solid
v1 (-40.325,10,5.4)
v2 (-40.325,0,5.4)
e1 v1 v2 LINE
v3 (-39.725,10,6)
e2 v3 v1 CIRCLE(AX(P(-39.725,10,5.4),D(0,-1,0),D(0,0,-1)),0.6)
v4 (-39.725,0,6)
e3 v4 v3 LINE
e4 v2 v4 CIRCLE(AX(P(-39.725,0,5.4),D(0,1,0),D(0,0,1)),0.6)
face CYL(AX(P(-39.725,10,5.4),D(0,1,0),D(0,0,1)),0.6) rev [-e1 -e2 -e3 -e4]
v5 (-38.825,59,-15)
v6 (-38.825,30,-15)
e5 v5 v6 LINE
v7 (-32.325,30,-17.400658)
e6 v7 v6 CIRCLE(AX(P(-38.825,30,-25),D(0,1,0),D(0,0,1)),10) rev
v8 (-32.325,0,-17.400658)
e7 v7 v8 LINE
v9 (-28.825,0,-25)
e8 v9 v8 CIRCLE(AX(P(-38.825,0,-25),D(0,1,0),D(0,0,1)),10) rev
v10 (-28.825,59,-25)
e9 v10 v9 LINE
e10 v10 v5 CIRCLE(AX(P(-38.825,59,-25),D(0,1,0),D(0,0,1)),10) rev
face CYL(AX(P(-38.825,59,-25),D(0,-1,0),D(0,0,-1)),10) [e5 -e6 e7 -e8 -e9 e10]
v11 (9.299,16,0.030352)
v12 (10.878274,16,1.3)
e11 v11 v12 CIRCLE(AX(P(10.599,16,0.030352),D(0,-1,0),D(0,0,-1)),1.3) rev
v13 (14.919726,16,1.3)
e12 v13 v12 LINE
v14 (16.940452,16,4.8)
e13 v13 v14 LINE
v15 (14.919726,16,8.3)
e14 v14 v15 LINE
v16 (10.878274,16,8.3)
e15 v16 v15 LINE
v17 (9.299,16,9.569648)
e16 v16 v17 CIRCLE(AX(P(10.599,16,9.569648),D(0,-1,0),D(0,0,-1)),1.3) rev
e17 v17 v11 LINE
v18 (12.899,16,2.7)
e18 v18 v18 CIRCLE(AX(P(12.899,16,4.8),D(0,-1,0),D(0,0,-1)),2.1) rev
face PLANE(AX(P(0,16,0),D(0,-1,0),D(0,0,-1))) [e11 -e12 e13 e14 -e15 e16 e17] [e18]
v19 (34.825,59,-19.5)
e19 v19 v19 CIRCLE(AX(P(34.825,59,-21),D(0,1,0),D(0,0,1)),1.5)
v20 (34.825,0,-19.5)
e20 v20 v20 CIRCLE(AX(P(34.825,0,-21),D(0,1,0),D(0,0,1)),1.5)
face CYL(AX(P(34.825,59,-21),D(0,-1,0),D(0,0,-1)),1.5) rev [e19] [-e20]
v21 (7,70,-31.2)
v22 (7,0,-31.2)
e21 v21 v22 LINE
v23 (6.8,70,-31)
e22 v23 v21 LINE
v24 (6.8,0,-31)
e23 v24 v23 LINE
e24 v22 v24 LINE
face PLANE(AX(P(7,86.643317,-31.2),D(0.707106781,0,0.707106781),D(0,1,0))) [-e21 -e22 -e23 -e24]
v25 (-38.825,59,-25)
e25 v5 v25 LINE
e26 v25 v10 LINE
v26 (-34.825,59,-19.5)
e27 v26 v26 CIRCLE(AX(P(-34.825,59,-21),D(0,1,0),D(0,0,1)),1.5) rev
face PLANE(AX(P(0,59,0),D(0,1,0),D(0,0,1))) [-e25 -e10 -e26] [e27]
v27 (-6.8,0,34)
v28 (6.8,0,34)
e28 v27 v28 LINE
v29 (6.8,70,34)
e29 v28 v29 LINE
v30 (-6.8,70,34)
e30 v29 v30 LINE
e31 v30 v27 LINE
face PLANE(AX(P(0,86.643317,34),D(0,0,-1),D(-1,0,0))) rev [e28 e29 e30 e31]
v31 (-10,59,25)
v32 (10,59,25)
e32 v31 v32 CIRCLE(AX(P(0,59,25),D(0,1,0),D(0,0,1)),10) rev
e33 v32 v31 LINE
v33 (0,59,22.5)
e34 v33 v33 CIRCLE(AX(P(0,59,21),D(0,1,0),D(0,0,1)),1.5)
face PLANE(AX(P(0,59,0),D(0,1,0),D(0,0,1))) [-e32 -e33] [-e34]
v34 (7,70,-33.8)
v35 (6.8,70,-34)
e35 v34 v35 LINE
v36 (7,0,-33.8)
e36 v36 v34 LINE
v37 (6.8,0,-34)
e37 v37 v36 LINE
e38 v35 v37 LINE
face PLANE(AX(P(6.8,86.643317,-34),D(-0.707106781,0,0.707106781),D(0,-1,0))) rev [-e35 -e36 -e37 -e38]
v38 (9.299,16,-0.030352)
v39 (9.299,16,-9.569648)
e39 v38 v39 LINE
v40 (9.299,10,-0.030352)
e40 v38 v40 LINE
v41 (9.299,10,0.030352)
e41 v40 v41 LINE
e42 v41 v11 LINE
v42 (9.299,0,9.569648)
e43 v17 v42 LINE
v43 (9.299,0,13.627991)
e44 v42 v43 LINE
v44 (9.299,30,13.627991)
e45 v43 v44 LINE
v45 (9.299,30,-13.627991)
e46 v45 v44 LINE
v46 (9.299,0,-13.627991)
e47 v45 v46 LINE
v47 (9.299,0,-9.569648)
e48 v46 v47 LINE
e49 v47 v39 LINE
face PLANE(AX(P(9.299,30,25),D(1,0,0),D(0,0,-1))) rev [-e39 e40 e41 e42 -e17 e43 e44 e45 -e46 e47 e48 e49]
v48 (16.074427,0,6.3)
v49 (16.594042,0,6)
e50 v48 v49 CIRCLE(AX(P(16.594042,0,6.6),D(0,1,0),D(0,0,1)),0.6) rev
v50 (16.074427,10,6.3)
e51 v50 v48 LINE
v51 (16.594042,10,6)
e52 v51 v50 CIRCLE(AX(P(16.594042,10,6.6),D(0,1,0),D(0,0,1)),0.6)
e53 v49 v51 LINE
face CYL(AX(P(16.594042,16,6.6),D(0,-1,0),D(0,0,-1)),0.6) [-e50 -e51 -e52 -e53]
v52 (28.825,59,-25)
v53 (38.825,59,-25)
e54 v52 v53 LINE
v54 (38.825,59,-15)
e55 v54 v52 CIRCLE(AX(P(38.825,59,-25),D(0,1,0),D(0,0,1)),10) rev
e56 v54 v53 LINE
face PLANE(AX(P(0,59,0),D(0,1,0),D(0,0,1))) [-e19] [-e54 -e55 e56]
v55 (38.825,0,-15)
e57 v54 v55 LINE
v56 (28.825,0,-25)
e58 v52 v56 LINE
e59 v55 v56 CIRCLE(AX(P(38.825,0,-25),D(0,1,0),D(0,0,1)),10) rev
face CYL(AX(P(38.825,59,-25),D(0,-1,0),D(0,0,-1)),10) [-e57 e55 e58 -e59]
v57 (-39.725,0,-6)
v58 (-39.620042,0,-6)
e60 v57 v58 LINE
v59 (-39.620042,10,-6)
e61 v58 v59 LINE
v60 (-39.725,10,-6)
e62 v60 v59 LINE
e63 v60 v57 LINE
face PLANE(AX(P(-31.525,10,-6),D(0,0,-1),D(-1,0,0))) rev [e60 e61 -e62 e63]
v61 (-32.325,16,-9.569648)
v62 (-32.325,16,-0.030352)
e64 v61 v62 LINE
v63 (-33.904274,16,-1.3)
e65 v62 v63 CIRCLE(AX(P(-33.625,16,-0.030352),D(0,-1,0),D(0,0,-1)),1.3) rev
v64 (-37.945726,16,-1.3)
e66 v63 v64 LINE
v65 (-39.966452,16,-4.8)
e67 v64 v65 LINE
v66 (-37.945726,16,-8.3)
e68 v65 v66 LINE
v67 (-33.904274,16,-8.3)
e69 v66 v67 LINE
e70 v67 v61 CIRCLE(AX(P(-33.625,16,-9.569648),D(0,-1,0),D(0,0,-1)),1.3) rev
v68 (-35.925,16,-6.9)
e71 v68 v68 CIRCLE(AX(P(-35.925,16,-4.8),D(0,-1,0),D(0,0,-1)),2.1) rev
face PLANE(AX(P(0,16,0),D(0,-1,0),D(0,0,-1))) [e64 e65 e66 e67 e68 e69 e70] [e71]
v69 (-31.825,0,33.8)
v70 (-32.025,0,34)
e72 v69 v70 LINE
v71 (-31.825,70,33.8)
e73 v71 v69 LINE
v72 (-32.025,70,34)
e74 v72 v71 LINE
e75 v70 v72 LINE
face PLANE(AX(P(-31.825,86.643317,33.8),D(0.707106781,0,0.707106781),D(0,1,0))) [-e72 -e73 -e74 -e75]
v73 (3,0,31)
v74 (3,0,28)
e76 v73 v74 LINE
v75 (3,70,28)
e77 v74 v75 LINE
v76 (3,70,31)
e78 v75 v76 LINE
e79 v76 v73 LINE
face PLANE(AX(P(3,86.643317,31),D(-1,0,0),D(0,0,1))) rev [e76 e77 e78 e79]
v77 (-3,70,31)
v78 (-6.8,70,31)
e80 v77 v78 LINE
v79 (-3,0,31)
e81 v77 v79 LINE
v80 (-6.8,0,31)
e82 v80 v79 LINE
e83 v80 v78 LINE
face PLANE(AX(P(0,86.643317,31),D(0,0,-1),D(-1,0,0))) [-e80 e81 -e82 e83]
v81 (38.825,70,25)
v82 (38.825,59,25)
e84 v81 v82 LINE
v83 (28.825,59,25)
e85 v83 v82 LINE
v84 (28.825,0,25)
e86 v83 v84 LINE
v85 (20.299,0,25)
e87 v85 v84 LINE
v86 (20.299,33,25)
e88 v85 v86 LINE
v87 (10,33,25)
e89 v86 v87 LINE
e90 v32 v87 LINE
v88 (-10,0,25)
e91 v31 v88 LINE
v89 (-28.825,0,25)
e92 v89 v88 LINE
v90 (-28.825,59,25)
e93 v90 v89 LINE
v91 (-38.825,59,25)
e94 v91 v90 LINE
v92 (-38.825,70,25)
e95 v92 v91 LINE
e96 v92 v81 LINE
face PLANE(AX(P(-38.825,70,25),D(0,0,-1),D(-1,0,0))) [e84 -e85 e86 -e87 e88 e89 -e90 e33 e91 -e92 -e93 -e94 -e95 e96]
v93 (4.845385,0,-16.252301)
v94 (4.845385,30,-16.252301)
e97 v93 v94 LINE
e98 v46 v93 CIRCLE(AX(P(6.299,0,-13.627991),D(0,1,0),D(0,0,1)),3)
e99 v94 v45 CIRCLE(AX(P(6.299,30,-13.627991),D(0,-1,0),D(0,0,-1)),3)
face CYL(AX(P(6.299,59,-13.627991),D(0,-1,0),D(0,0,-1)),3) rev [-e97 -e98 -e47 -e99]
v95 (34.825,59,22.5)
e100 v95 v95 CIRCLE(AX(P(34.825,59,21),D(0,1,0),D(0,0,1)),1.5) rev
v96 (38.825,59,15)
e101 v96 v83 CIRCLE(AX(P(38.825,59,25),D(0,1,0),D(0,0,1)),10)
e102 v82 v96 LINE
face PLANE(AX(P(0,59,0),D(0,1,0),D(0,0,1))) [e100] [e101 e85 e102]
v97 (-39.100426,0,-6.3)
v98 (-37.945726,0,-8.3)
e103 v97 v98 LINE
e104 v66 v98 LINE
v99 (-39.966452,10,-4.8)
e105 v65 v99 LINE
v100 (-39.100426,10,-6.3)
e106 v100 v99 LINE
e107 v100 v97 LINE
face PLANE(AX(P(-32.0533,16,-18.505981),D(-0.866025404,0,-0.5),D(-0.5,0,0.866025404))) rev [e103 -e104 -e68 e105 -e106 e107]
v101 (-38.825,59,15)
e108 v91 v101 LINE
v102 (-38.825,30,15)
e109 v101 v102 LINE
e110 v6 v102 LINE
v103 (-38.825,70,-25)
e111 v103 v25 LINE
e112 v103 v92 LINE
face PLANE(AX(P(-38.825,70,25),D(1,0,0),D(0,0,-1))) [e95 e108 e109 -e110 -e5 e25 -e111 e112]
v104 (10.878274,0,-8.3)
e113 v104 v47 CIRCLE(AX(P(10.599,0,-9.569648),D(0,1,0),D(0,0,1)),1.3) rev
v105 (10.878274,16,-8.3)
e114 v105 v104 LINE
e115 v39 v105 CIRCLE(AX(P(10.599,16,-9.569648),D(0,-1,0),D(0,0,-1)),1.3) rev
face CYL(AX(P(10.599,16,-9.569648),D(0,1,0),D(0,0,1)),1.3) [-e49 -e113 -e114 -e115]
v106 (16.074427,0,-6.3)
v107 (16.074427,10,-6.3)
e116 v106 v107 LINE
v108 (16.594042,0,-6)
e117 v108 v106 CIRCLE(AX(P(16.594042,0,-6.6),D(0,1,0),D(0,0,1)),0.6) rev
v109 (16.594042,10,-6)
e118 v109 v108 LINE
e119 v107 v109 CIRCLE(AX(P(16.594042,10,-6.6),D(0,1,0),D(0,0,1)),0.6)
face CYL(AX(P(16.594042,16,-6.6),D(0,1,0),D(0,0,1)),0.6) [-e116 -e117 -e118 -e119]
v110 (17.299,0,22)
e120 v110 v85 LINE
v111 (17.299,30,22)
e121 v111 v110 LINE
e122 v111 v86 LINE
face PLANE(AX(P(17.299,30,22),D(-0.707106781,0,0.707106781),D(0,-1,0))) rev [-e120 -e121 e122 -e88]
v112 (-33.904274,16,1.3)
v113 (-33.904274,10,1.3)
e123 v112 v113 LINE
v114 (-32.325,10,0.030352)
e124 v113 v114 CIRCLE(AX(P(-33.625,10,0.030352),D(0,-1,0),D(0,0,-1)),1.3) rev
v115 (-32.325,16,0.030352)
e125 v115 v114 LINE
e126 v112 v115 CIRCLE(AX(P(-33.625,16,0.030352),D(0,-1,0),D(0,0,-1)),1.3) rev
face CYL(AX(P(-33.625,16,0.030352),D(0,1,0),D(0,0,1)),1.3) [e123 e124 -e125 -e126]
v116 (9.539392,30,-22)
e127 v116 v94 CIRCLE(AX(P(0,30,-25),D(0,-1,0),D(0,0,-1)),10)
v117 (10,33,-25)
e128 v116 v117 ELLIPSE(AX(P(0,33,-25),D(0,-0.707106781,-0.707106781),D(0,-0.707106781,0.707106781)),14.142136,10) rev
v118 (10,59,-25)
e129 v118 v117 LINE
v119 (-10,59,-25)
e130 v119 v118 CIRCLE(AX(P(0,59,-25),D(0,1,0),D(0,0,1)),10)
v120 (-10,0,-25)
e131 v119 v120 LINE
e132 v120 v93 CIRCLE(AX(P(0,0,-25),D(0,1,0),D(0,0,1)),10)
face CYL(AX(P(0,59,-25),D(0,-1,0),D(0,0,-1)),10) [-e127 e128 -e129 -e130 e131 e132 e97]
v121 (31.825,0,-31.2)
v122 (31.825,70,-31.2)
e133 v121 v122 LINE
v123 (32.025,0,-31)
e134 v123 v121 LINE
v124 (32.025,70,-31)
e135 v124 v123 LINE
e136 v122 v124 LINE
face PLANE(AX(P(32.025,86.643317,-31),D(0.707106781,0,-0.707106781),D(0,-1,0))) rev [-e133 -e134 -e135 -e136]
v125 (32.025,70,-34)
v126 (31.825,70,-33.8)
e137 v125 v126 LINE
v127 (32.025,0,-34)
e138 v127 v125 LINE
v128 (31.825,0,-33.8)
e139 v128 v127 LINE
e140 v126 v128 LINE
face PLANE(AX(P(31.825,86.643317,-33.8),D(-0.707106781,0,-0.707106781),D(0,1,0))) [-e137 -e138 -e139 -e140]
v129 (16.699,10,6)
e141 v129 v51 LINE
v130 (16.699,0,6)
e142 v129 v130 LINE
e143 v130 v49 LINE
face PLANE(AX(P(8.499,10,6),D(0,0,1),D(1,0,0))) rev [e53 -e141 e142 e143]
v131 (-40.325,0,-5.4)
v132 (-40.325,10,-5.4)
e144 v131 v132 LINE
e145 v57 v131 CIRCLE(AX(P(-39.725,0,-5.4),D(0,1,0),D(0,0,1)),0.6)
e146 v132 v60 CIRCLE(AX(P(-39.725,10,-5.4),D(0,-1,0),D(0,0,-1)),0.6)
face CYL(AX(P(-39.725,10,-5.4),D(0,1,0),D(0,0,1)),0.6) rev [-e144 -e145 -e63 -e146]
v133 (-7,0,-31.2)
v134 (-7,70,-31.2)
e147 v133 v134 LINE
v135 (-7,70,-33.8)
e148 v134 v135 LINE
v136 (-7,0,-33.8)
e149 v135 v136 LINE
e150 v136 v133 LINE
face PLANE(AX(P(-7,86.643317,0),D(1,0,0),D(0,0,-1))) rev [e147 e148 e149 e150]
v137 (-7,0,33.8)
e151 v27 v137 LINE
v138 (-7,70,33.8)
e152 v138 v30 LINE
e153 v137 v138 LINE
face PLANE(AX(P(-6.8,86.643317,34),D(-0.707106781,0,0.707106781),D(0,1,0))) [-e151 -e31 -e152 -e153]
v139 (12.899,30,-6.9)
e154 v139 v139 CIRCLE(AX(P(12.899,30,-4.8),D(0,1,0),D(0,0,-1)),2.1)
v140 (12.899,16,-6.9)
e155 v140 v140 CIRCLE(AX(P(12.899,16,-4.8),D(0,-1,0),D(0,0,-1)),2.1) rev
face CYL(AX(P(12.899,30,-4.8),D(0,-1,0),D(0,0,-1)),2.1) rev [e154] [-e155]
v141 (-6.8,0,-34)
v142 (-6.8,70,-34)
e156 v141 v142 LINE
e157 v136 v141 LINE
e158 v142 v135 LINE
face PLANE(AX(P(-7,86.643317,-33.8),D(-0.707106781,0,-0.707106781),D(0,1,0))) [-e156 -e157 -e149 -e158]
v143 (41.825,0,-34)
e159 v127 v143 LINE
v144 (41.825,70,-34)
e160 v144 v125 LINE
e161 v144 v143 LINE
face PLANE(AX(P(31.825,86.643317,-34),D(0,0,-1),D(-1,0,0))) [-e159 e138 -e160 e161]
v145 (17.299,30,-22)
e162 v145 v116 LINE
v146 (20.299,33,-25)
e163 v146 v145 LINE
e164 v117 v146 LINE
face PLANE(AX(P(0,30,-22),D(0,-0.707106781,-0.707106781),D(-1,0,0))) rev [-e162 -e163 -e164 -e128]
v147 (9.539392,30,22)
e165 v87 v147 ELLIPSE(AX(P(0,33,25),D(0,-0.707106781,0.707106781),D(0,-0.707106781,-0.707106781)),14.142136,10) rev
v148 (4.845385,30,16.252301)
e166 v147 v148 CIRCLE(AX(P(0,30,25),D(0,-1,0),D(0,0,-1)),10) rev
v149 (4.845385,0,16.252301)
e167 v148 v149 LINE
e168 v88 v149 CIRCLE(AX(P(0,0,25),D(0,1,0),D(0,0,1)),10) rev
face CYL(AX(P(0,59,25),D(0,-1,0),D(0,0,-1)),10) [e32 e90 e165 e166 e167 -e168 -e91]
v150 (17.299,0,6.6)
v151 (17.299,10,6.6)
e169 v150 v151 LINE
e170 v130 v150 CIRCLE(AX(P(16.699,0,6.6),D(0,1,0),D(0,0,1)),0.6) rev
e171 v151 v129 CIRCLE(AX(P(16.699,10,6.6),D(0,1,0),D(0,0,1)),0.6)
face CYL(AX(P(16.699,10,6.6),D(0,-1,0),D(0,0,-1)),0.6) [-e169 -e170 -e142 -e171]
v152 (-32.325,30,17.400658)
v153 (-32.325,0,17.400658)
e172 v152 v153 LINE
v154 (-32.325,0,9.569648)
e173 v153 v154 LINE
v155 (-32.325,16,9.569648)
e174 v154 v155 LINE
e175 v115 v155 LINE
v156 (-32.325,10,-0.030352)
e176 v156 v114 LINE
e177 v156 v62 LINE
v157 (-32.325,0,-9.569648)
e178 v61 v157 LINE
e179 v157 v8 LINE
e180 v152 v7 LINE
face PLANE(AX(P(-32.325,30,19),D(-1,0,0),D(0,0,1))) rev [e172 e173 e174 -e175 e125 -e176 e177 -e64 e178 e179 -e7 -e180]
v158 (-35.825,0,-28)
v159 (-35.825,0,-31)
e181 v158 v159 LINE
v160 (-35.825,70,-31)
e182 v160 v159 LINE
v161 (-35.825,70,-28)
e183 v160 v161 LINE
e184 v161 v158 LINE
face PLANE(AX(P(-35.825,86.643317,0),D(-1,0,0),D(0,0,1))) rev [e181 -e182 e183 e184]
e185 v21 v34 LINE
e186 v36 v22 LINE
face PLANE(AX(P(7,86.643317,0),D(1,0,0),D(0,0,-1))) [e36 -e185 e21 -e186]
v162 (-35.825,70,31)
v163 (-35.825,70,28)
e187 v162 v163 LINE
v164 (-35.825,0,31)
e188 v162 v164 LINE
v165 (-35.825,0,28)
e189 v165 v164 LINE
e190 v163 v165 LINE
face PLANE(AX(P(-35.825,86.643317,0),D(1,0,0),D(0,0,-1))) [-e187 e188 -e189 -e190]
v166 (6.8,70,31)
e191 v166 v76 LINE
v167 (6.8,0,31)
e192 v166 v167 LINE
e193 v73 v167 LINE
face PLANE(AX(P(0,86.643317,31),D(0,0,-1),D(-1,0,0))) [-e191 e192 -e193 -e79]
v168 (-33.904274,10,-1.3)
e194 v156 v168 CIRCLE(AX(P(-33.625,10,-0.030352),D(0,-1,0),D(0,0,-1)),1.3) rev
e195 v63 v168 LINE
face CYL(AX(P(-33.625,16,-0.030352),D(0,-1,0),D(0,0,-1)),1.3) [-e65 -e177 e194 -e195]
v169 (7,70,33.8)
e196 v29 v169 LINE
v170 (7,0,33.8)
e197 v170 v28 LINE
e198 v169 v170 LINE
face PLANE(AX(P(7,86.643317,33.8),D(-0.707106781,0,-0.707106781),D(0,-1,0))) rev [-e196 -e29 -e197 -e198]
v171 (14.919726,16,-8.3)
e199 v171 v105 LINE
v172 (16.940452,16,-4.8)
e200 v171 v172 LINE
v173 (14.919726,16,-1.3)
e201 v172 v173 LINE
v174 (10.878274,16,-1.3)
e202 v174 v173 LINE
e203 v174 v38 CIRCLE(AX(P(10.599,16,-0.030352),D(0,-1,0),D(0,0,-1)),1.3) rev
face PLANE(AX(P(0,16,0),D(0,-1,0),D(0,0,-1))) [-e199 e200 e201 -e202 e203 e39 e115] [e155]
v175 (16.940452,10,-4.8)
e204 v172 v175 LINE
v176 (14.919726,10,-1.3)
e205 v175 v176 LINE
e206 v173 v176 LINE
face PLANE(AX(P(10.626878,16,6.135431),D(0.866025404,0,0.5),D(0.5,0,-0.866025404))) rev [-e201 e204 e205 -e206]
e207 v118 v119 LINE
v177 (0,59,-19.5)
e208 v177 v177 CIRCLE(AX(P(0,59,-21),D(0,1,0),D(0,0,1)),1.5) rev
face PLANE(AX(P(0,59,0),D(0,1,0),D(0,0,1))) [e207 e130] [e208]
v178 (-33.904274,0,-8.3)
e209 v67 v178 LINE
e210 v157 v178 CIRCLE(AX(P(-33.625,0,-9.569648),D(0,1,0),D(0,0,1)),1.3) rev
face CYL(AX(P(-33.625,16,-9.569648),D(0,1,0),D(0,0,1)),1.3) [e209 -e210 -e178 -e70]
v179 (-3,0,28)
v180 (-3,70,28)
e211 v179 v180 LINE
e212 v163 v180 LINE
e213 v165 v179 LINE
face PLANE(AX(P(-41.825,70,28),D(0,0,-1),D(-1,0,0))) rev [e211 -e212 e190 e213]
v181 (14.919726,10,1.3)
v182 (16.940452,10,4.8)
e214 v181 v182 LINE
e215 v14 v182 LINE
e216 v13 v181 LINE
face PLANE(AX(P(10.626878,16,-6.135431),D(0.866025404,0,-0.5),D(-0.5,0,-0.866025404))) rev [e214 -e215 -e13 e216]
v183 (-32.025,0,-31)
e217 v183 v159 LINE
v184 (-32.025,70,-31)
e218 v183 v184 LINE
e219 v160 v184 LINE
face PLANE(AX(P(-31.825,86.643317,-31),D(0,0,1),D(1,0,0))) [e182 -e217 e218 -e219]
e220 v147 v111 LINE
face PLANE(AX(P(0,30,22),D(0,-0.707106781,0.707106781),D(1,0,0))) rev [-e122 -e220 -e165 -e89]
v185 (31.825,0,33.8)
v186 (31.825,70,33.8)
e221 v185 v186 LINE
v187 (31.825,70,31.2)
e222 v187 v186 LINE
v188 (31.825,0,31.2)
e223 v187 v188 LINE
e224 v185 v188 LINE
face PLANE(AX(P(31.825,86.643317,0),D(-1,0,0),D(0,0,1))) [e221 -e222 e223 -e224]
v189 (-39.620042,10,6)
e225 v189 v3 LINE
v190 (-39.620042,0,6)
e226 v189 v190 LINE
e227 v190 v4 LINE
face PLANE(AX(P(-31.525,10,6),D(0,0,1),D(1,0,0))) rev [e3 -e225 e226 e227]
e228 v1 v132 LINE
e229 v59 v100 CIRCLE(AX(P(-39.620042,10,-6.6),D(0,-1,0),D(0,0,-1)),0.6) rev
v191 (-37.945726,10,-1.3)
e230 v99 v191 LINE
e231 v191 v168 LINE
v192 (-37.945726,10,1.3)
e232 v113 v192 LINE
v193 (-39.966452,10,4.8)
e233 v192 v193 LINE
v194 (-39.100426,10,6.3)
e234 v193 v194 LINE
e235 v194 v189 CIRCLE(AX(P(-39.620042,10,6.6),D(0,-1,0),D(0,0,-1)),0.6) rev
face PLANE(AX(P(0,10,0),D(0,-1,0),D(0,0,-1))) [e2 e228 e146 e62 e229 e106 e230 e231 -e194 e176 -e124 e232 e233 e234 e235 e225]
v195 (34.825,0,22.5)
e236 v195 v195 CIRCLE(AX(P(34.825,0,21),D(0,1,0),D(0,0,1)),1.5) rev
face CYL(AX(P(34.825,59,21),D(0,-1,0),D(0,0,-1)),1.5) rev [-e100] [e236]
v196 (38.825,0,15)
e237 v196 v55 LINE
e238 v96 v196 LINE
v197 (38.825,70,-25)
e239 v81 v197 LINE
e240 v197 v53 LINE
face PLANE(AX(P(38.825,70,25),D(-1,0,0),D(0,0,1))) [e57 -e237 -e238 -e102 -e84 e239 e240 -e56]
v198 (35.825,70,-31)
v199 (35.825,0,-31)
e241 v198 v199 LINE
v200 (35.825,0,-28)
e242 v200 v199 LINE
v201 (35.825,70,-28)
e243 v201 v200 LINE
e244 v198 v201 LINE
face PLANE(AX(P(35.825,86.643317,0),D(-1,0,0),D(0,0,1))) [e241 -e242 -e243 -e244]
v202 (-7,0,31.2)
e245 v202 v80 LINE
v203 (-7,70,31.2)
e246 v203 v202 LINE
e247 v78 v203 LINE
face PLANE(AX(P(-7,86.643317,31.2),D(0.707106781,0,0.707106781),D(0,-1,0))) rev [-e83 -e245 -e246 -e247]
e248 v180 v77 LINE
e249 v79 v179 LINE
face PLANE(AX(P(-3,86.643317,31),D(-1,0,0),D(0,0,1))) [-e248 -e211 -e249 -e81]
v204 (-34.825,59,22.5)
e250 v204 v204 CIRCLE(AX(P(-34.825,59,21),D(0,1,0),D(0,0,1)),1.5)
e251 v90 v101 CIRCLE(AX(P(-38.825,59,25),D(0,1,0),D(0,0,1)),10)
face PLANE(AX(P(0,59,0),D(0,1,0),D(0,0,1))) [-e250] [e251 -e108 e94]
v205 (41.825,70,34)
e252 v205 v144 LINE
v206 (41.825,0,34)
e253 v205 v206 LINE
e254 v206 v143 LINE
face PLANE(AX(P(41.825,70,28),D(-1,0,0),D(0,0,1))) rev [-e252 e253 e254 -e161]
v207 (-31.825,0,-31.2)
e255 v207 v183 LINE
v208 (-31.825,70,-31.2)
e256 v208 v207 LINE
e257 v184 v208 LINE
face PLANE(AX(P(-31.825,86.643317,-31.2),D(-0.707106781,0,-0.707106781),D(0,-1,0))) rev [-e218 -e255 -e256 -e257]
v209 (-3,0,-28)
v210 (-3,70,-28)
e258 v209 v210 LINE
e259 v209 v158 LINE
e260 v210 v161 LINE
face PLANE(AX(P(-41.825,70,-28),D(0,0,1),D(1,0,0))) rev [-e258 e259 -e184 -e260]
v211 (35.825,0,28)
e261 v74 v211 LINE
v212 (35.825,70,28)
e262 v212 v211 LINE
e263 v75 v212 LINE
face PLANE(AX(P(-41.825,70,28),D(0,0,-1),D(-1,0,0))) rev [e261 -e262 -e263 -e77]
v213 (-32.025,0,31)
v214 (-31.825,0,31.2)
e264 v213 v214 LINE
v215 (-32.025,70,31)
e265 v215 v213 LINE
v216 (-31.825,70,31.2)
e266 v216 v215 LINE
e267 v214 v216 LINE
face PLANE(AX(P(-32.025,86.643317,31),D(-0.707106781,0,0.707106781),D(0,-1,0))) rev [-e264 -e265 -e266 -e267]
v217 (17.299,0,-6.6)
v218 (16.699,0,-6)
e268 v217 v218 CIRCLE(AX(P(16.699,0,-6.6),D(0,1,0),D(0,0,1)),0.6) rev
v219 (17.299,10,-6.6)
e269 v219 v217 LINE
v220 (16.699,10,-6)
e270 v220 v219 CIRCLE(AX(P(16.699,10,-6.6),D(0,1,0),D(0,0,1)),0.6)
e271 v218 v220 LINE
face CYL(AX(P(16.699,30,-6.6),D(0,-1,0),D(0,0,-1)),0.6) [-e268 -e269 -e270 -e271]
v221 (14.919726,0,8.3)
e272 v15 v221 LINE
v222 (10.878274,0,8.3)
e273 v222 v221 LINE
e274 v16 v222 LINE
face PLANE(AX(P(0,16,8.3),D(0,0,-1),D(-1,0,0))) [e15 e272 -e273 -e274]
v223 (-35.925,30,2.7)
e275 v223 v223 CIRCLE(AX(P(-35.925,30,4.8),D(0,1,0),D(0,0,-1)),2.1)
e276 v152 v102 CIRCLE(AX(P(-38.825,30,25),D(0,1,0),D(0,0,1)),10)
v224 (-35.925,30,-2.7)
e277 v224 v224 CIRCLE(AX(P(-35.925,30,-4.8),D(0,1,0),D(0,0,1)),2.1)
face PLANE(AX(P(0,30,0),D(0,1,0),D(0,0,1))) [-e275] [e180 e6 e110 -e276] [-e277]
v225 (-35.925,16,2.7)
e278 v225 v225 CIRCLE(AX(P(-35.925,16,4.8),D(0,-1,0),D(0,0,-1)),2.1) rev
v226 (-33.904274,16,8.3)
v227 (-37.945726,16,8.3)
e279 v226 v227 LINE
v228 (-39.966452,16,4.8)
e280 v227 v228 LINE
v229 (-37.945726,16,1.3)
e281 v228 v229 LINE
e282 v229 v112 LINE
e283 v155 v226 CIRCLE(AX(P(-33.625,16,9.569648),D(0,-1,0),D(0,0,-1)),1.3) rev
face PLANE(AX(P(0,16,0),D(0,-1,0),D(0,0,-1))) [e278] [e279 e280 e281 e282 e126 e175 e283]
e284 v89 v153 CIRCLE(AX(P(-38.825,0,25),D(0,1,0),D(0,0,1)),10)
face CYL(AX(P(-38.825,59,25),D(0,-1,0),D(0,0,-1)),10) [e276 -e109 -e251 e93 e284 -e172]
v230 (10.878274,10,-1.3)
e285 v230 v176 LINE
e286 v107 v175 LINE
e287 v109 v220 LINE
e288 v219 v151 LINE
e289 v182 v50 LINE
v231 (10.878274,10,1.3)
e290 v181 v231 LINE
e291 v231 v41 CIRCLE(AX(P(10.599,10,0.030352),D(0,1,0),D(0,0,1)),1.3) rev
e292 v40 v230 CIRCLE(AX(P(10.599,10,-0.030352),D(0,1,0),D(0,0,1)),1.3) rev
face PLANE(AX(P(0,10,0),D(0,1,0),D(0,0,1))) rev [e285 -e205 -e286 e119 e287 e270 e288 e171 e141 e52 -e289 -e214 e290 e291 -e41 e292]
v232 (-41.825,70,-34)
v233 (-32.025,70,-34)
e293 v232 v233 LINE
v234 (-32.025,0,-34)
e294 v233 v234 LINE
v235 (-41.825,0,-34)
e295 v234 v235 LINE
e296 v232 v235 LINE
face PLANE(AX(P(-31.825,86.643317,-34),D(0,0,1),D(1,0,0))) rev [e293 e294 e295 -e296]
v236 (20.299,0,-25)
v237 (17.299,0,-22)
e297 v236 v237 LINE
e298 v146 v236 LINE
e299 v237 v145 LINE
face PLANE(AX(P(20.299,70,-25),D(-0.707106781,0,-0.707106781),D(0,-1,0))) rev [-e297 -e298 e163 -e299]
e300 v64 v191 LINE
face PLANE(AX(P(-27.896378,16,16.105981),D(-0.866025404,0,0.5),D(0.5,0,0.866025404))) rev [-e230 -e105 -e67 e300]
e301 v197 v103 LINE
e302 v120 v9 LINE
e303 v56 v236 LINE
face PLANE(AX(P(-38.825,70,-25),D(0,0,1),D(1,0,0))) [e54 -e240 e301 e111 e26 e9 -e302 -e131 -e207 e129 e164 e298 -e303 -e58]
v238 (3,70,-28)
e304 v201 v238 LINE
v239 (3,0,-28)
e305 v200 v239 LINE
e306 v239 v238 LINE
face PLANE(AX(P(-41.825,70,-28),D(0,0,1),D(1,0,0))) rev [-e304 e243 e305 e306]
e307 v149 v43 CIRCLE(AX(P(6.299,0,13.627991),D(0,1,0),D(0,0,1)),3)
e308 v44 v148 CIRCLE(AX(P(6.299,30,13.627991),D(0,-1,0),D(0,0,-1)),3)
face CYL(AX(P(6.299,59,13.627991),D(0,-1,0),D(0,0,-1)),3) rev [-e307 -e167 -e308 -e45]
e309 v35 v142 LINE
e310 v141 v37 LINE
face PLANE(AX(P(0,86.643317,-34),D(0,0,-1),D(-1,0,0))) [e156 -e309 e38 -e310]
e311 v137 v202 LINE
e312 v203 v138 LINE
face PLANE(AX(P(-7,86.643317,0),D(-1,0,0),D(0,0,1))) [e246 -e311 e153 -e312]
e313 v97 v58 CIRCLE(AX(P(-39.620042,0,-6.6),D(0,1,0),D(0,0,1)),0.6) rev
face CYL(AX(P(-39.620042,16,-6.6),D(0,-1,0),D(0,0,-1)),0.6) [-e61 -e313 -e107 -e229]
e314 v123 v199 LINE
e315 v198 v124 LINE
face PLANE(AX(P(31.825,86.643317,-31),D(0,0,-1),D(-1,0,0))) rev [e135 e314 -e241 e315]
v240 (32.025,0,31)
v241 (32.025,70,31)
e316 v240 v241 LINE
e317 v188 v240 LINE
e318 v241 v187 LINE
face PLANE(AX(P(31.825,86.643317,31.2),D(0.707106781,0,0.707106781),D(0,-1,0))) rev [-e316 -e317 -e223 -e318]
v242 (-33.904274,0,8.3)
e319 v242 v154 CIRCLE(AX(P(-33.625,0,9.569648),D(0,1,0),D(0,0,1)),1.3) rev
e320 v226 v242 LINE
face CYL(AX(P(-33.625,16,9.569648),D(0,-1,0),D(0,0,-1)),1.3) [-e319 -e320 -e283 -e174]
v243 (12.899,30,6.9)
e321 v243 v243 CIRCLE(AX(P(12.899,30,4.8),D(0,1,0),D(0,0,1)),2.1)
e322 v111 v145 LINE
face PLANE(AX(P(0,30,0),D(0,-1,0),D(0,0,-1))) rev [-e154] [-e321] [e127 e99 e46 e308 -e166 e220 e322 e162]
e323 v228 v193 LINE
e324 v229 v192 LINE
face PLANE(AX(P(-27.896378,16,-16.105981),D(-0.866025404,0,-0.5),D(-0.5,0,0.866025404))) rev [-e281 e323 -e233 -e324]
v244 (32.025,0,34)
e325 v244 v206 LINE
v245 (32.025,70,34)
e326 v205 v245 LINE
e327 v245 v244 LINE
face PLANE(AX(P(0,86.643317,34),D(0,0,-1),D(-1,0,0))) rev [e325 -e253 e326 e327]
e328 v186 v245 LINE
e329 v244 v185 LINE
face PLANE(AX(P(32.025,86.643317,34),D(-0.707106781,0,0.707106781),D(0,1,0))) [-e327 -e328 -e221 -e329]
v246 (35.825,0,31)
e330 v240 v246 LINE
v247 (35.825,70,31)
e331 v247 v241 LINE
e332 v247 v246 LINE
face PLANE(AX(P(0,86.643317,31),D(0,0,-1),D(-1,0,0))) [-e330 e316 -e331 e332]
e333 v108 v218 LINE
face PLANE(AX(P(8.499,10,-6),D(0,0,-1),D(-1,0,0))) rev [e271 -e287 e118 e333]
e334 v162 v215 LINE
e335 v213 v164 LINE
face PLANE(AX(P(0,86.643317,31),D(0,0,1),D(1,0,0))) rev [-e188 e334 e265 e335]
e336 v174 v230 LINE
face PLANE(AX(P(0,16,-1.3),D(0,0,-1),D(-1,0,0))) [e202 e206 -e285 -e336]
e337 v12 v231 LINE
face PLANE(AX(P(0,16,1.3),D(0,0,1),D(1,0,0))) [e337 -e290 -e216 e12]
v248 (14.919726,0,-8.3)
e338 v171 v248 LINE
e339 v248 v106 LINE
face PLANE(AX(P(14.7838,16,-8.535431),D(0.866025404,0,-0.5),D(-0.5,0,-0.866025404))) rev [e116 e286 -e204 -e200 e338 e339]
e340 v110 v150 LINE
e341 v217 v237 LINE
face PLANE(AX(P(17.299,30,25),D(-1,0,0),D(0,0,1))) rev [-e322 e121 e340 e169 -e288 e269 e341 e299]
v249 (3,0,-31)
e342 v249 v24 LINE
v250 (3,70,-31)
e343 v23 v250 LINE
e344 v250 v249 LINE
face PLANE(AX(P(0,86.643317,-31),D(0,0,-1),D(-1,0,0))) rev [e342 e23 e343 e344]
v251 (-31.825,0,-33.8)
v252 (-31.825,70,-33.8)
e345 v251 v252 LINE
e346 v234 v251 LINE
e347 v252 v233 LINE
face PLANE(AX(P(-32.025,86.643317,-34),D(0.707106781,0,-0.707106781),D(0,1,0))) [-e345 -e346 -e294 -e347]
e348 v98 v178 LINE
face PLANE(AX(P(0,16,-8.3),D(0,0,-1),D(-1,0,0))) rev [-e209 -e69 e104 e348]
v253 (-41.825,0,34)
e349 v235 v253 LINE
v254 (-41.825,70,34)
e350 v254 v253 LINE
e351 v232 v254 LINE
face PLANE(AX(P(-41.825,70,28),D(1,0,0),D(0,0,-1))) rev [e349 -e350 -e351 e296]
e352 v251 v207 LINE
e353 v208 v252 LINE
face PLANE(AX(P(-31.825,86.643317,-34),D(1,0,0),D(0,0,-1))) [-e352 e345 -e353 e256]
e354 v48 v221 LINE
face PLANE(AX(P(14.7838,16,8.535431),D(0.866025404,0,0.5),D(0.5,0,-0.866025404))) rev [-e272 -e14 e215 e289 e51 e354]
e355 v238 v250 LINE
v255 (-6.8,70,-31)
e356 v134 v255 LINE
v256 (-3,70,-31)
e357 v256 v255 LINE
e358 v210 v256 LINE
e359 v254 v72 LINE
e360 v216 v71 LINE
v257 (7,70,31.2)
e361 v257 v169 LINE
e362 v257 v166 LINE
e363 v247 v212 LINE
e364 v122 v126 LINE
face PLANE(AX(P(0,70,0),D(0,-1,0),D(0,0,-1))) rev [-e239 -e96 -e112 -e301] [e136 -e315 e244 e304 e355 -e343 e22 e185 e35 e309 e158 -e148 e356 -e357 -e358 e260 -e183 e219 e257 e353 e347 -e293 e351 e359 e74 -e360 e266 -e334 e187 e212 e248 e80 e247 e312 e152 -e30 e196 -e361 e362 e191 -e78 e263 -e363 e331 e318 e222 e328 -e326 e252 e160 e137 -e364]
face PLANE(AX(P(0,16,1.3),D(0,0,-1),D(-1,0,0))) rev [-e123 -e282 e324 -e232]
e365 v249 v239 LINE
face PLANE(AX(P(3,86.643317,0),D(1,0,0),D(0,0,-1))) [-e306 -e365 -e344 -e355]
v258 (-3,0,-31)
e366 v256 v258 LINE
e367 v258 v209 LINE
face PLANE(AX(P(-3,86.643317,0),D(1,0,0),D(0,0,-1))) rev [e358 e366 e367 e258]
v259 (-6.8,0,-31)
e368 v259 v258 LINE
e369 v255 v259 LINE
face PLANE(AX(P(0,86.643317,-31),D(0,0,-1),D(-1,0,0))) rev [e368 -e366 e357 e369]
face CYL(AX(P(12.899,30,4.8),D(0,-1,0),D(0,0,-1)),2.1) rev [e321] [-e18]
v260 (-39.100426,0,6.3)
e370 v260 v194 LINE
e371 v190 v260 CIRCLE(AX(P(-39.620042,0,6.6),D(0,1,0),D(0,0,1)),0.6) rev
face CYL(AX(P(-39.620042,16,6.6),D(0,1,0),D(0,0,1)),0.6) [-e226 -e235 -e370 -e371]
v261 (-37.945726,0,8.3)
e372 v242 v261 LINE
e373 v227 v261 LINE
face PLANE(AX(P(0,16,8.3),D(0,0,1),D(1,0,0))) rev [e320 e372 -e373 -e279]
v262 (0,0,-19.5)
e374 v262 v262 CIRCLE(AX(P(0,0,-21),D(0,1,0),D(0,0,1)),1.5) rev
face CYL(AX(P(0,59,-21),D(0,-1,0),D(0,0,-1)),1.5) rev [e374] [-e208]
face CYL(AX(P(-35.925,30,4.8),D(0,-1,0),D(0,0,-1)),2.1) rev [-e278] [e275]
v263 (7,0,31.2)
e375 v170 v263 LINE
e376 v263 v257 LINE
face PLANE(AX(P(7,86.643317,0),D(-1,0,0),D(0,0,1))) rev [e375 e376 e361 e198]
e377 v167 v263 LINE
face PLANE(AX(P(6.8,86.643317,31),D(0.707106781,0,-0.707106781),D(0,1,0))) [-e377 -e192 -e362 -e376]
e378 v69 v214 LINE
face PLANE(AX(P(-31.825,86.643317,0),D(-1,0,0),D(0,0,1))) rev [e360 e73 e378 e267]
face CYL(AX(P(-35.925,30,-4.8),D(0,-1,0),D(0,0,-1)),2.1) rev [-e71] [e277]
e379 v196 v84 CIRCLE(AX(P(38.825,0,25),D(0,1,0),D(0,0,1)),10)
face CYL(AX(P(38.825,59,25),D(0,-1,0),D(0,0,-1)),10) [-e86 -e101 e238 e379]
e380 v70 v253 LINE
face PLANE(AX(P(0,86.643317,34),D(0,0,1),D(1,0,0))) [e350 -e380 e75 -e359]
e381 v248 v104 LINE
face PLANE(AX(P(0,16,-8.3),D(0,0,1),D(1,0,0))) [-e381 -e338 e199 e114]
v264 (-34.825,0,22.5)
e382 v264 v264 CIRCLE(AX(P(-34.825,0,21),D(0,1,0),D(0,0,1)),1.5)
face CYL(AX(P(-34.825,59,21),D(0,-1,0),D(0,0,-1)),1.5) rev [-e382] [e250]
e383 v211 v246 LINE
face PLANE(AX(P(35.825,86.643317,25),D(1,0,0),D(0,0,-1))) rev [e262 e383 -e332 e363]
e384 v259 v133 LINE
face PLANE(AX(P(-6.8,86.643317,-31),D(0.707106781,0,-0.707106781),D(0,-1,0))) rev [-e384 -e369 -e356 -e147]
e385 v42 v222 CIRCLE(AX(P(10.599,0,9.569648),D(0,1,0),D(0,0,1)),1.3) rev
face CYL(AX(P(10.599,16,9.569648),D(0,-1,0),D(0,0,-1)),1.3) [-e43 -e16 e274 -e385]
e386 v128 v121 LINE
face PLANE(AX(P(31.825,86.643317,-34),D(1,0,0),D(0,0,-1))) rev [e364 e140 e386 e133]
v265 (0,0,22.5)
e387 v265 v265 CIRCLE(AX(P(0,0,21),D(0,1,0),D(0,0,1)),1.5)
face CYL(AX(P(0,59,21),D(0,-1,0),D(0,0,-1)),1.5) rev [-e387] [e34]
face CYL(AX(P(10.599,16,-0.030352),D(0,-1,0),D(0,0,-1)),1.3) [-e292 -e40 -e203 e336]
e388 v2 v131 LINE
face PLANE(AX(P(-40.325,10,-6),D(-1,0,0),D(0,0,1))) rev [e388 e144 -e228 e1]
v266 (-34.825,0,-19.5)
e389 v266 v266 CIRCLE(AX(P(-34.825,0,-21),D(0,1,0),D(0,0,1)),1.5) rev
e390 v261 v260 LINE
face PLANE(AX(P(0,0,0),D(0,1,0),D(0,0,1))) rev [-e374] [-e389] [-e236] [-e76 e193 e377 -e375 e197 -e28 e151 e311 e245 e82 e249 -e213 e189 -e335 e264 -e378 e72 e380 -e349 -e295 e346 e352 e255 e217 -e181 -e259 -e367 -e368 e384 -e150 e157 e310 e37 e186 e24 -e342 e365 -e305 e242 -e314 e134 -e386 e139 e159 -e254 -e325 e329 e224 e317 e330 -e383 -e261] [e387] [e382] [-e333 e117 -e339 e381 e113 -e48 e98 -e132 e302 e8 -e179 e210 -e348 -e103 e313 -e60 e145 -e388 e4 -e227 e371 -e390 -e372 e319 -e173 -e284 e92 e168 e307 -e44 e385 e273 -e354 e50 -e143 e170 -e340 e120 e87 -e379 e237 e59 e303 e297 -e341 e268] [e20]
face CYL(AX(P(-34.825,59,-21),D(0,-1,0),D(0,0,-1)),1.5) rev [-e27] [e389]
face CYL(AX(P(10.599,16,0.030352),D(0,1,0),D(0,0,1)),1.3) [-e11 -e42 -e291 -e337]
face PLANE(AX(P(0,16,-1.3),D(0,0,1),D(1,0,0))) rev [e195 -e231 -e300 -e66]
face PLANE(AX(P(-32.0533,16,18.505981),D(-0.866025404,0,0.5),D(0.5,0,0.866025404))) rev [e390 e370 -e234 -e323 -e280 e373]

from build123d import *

# Parameters (mm, degrees)
SKETCH1_R             = 1.5
BOSS_EXTRUDE6_DEPTH   = 59
BOSS_EXTRUDE6_2_DEPTH = 59
BOSS_EXTRUDE6_3_DEPTH = 59
BOSS_EXTRUDE6_4_DEPTH = 59
BOSS_EXTRUDE6_5_DEPTH = 59
BOSS_EXTRUDE6_6_DEPTH = 59
SKETCH2_W             = 83.65
SKETCH2_H             = 56
SKETCH2_W_2           = 77.65
SKETCH2_H_2           = 50
BOSS_EXTRUDE7_DEPTH   = 70
SKETCH3_R             = 2.1
SKETCH3_W             = 8
SKETCH3_H             = 50
BOSS_EXTRUDE8_DEPTH   = 30
CHAMFER1_SIZE         = 3
FILLET1_R             = 3
SKETCH4_R             = 2.1
CUT_EXTRUDE2_DEPTH    = 16
FILLET2_R             = 1.3
SKETCH5_W             = 8.8
SKETCH5_H             = 12
CUT_EXTRUDE3_DEPTH    = 10
FILLET3_R             = 0.6
SKETCH6_W             = 6
SKETCH6_H             = 6
BOSS_EXTRUDE9_DEPTH   = 70
CHAMFER3_SIZE         = 0.2


with BuildPart() as part:
    # Sketch1 → Boss-Extrude6 (new body)
    with BuildSketch(Plane(origin=(0, 0, 0), x_dir=(1, 0, 0), z_dir=(0, 1, 0))):
        with BuildLine():
            Line((-38.825, 15), (-38.825, 25))
            Line((-38.825, 25), (-28.825, 25))
            ThreePointArc((-28.825, 25), (-31.753932188, 17.928932188), (-38.825, 15))
        make_face()
        with Locations(Location((-34.825, 21, 0), (0, 0, 270))):
            Circle(SKETCH1_R, mode=Mode.SUBTRACT)
    extrude(amount=BOSS_EXTRUDE6_DEPTH)



with BuildPart() as body_2:
    # Sketch1 → Boss-Extrude6 2 (new body)
    with BuildSketch(Plane(origin=(0, 0, 0), x_dir=(1, 0, 0), z_dir=(0, 1, 0))):
        with BuildLine():
            Line((-38.825, -25), (-28.825, -25))
            ThreePointArc((-28.825, -25), (-31.753932188, -17.928932188), (-38.825, -15))
            Line((-38.825, -15), (-38.825, -25))
        make_face()
        with Locations(Location((-34.825, -21, 0), (0, 0, 270))):
            Circle(SKETCH1_R, mode=Mode.SUBTRACT)
    extrude(amount=BOSS_EXTRUDE6_2_DEPTH)


with BuildPart() as body_3:
    # Sketch1 → Boss-Extrude6 3 (new body)
    with BuildSketch(Plane(origin=(0, 0, 0), x_dir=(1, 0, 0), z_dir=(0, 1, 0))):
        with BuildLine():
            Line((38.825, -25), (38.825, -15))
            ThreePointArc((38.825, -15), (31.753932188, -17.928932188), (28.825, -25))
            Line((28.825, -25), (38.825, -25))
        make_face()
        with Locations(Location((34.825, -21, 0), (0, 0, 270))):
            Circle(SKETCH1_R, mode=Mode.SUBTRACT)
    extrude(amount=BOSS_EXTRUDE6_3_DEPTH)


with BuildPart() as body_4:
    # Sketch1 → Boss-Extrude6 4 (new body)
    with BuildSketch(Plane(origin=(0, 0, 0), x_dir=(1, 0, 0), z_dir=(0, 1, 0))):
        with BuildLine():
            Line((28.825, 25), (38.825, 25))
            Line((38.825, 25), (38.825, 15))
            ThreePointArc((38.825, 15), (31.753932188, 17.928932188), (28.825, 25))
        make_face()
        with Locations(Location((34.825, 21, 0), (0, 0, 270))):
            Circle(SKETCH1_R, mode=Mode.SUBTRACT)
    extrude(amount=BOSS_EXTRUDE6_4_DEPTH)


with BuildPart() as body_5:
    # Sketch1 → Boss-Extrude6 5 (new body)
    with BuildSketch(Plane(origin=(0, 0, 0), x_dir=(1, 0, 0), z_dir=(0, 1, 0))):
        with BuildLine():
            Line((10, -25), (-10, -25))
            ThreePointArc((-10, -25), (0, -15), (10, -25))
        make_face()
        with Locations(Location((0, -21, 0), (0, 0, 270))):
            Circle(SKETCH1_R, mode=Mode.SUBTRACT)
    extrude(amount=BOSS_EXTRUDE6_5_DEPTH)


with BuildPart() as body_6:
    # Sketch1 → Boss-Extrude6 6 (new body)
    with BuildSketch(Plane(origin=(0, 0, 0), x_dir=(1, 0, 0), z_dir=(0, 1, 0))):
        with BuildLine():
            Line((10, 25), (-10, 25))
            ThreePointArc((-10, 25), (0, 15), (10, 25))
        make_face()
        with Locations(Location((0, 21, 0), (0, 0, 270))):
            Circle(SKETCH1_R, mode=Mode.SUBTRACT)
    extrude(amount=BOSS_EXTRUDE6_6_DEPTH)


with BuildPart() as part_1:
    add(part.part)

    add(body_2.part)  # Boss-Extrude7 merges body 2

    add(body_3.part)  # Boss-Extrude7 merges body 3

    add(body_4.part)  # Boss-Extrude7 merges body 4

    add(body_5.part)  # Boss-Extrude7 merges body 5

    add(body_6.part)  # Boss-Extrude7 merges body 6
    # Sketch2 → Boss-Extrude7 (add)
    with BuildSketch(Plane(origin=(0, 0, 0), x_dir=(1, 0, 0), z_dir=(0, 1, 0))):
        Rectangle(SKETCH2_W, SKETCH2_H)
        Rectangle(SKETCH2_W_2, SKETCH2_H_2, mode=Mode.SUBTRACT)
    extrude(amount=BOSS_EXTRUDE7_DEPTH)

    # Sketch3 → Boss-Extrude8 (add)
    # profile 1 of 2: a face of its own
    with BuildSketch(Plane(origin=(0, 0, 0), x_dir=(1, 0, 0), z_dir=(0, 1, 0))):
        Polygon((-38.825, 0), (-38.825, 19), (-32.325, 19), (-32.325, -19), (-38.825, -19), align=None)
        with Locations(Location((-35.925, 4.8, 0), (0, 0, 270))):
            Circle(SKETCH3_R, mode=Mode.SUBTRACT)
        with Locations(Location((-35.925, -4.8, 0), (0, 0, 90))):
            Circle(SKETCH3_R, mode=Mode.SUBTRACT)
    # profile 2 of 2: a face of its own
    with BuildSketch(Plane(origin=(0, 0, 0), x_dir=(1, 0, 0), z_dir=(0, 1, 0))):
        with Locations((13.299000327, 0)):
            Rectangle(SKETCH3_W, SKETCH3_H)
        with Locations(Location((12.899000327, -4.8, 0), (0, 0, 270))):
            Circle(SKETCH3_R, mode=Mode.SUBTRACT)
        with Locations(Location((12.899000327, 4.8, 0), (0, 0, 90))):
            Circle(SKETCH3_R, mode=Mode.SUBTRACT)
    extrude(amount=BOSS_EXTRUDE8_DEPTH)

    # Chamfer1
    chamfer1_edges = [part_1.edges().sort_by_distance(p)[0] for p in [
        (13.649500163, 30, 25),
        (13.649500163, 30, -25),
        (17.299000327, 15, -25),
        (17.299000327, 15, 25),
    ]]
    chamfer(chamfer1_edges, length=CHAMFER1_SIZE)

    # Fillet1
    fillet1_edges = [part_1.edges().sort_by_distance(p)[0] for p in [
        (9.299000327, 15, -21.32187644),
        (9.299000327, 15, 21.32187644),
    ]]
    fillet(fillet1_edges, radius=FILLET1_R)

    # Sketch4 → Cut-Extrude2 (cut)
    # profile 1 of 4: a face of its own
    with BuildSketch(Plane.XZ):
        Polygon((-32.325, 4.035382907), (-32.325, 5.564617093), (-33.904274058, 8.3), (-37.945725942, 8.3), (-39.966451884, 4.8), (-37.945725942, 1.3), (-33.904274058, 1.3), align=None)
        with Locations(Location((-35.925, 4.8, 0), (0, 0, 270))):
            Circle(SKETCH4_R, mode=Mode.SUBTRACT)
    # profile 2 of 4: a face of its own
    with BuildSketch(Plane.XZ):
        Polygon((-32.325, -5.564617093), (-32.325, -4.035382907), (-33.904274058, -1.3), (-37.945725942, -1.3), (-39.966451884, -4.8), (-37.945725942, -8.3), (-33.904274058, -8.3), align=None)
        with Locations(Location((-35.925, -4.8, 0), (0, 0, 270))):
            Circle(SKETCH4_R, mode=Mode.SUBTRACT)
    # profile 3 of 4: a face of its own
    with BuildSketch(Plane.XZ):
        Polygon((10.878274385, -1.3), (9.299000327, -4.035382907), (9.299000327, -5.564617093), (10.878274385, -8.3), (14.919726269, -8.3), (16.940452211, -4.8), (14.919726269, -1.3), align=None)
        with Locations(Location((12.899000327, -4.8, 0), (0, 0, 270))):
            Circle(SKETCH4_R, mode=Mode.SUBTRACT)
    # profile 4 of 4: a face of its own
    with BuildSketch(Plane.XZ):
        Polygon((14.919726269, 1.3), (16.940452211, 4.8), (14.919726269, 8.3), (10.878274385, 8.3), (9.299000327, 5.564617093), (9.299000327, 4.035382907), (10.878274385, 1.3), align=None)
        with Locations(Location((12.899000327, 4.8, 0), (0, 0, 270))):
            Circle(SKETCH4_R, mode=Mode.SUBTRACT)
    extrude(amount=-CUT_EXTRUDE2_DEPTH, mode=Mode.SUBTRACT)

    # Fillet2
    # the kernel refuses this fillet: 1.3 mm, written as the material it takes off along each edge
    with BuildSketch(Plane(origin=(9.299000327, -10.012577226, -5.564617093), x_dir=(0.5000000000000003, 0, -0.8660254037844384), z_dir=(0, 1, 0)), Plane(origin=(9.299000327, -10.012577226, 4.035382907), x_dir=(0.5000000000000006, 0, -0.8660254037844383), z_dir=(0, 1, 0)), Plane(origin=(-32.325, -10.012577226, 5.564617093), x_dir=(-0.4999999999999981, 0, 0.8660254037844398), z_dir=(0, 1, 0)), Plane(origin=(-32.325, -10.012577226, -4.035382907), x_dir=(-0.5000000000000001, 0, 0.8660254037844386), z_dir=(0, 1, 0))) as fillet2_piece_1:
        with BuildLine():
            CenterArc((4.118458494, 0.87668242), FILLET2_R, 120, 102.405330947)
            Line((3.468458494, 2.002515445), (0, 0))
            Line((0, 0), (3.158548116, 0))
        make_face()
    extrude(amount=26.012577226, mode=Mode.SUBTRACT)
    with BuildSketch(Plane(origin=(9.299000327, -10.012577226, -4.035382907), x_dir=(0.4999999999999997, 0, 0.8660254037844388), z_dir=(0, 1, 0)), Plane(origin=(9.299000327, -10.012577226, 5.564617093), x_dir=(0.49999999999999944, 0, 0.866025403784439), z_dir=(0, 1, 0)), Plane(origin=(-32.325, -10.012577226, -5.564617093), x_dir=(-0.5000000000000004, 0, -0.8660254037844384), z_dir=(0, 1, 0)), Plane(origin=(-32.325, -10.012577226, 4.035382907), x_dir=(-0.5000000000000004, 0, -0.8660254037844383), z_dir=(0, 1, 0))) as fillet2_piece_2:
        with BuildLine():
            CenterArc((4.118458494, -0.87668242), FILLET2_R, 137.594669053, 102.405330947)
            Line((3.468458494, -2.002515445), (0, 0))
            Line((0, 0), (3.158548116, 0))
        make_face()
    extrude(amount=26.012577226, mode=Mode.SUBTRACT)

    # Sketch5 → Cut-Extrude3 (cut)
    with BuildSketch(Plane.XZ):
        with Locations((12.899000327, 0)):
            Rectangle(SKETCH5_W, SKETCH5_H)
        with Locations((-35.925, 0)):
            Rectangle(SKETCH5_W, SKETCH5_H)
    extrude(amount=-CUT_EXTRUDE3_DEPTH, mode=Mode.SUBTRACT)

    # Fillet3
    fillet3_edges = [part_1.edges().sort_by_distance(p)[0] for p in [
        (16.247631888, 5, 6),
        (16.247631888, 5, -6),
        (17.299000327, 5, -6),
        (17.299000327, 5, 6),
        (-39.273631561, 5, -6),
        (-39.273631561, 5, 6),
        (-40.325, 5, 6),
        (-40.325, 5, -6),
    ]]
    fillet(fillet3_edges, radius=FILLET3_R)

    # Sketch6 → Boss-Extrude9 (add)
    with BuildSketch(Plane(origin=(0, 0, 0), x_dir=(1, 0, 0), z_dir=(0, 1, 0))):
        Polygon((-7, 31), (-3, 31), (3, 31), (7, 31), (7, 34), (-7, 34), align=None)
        with Locations((0, 28)):
            Rectangle(SKETCH6_W, SKETCH6_H)
        with Locations((-38.825, 28)):
            Rectangle(SKETCH6_W, SKETCH6_H)
        Polygon((-41.825, 31), (-35.825, 31), (-31.825, 31), (-31.825, 34), (-41.825, 34), align=None)
        Polygon((41.825, 31), (41.825, 34), (31.825, 34), (31.825, 31), (35.825, 31), align=None)
        with Locations((38.825, 28)):
            Rectangle(SKETCH6_W, SKETCH6_H)
        with Locations((38.825, -28)):
            Rectangle(SKETCH6_W, SKETCH6_H)
        Polygon((41.825, -31), (35.825, -31), (31.825, -31), (31.825, -34), (41.825, -34), align=None)
        Polygon((-41.825, -31), (-41.825, -34), (-31.825, -34), (-31.825, -31), (-35.825, -31), align=None)
        with Locations((-38.825, -28)):
            Rectangle(SKETCH6_W, SKETCH6_H)
        Polygon((-7, -34), (7, -34), (7, -31), (3, -31), (-3, -31), (-7, -31), align=None)
        with Locations((0, -28)):
            Rectangle(SKETCH6_W, SKETCH6_H)
    extrude(amount=BOSS_EXTRUDE9_DEPTH)

    # Chamfer3
    chamfer3_edges = [part_1.edges().sort_by_distance(p)[0] for p in [
        (-31.825, 35, 31),
        (-31.825, 35, 34),
        (31.825, 35, 34),
        (31.825, 35, 31),
        (-31.825, 35, -34),
        (-31.825, 35, -31),
        (-7, 35, -31),
        (-7, 35, -34),
        (7, 35, -34),
        (7, 35, -31),
        (31.825, 35, -34),
        (31.825, 35, -31),
        (-7, 35, 34),
        (7, 35, 34),
        (-7, 35, 31),
        (7, 35, 31),
    ]]
    chamfer(chamfer3_edges, length=CHAMFER3_SIZE)


solid = part_1.part
